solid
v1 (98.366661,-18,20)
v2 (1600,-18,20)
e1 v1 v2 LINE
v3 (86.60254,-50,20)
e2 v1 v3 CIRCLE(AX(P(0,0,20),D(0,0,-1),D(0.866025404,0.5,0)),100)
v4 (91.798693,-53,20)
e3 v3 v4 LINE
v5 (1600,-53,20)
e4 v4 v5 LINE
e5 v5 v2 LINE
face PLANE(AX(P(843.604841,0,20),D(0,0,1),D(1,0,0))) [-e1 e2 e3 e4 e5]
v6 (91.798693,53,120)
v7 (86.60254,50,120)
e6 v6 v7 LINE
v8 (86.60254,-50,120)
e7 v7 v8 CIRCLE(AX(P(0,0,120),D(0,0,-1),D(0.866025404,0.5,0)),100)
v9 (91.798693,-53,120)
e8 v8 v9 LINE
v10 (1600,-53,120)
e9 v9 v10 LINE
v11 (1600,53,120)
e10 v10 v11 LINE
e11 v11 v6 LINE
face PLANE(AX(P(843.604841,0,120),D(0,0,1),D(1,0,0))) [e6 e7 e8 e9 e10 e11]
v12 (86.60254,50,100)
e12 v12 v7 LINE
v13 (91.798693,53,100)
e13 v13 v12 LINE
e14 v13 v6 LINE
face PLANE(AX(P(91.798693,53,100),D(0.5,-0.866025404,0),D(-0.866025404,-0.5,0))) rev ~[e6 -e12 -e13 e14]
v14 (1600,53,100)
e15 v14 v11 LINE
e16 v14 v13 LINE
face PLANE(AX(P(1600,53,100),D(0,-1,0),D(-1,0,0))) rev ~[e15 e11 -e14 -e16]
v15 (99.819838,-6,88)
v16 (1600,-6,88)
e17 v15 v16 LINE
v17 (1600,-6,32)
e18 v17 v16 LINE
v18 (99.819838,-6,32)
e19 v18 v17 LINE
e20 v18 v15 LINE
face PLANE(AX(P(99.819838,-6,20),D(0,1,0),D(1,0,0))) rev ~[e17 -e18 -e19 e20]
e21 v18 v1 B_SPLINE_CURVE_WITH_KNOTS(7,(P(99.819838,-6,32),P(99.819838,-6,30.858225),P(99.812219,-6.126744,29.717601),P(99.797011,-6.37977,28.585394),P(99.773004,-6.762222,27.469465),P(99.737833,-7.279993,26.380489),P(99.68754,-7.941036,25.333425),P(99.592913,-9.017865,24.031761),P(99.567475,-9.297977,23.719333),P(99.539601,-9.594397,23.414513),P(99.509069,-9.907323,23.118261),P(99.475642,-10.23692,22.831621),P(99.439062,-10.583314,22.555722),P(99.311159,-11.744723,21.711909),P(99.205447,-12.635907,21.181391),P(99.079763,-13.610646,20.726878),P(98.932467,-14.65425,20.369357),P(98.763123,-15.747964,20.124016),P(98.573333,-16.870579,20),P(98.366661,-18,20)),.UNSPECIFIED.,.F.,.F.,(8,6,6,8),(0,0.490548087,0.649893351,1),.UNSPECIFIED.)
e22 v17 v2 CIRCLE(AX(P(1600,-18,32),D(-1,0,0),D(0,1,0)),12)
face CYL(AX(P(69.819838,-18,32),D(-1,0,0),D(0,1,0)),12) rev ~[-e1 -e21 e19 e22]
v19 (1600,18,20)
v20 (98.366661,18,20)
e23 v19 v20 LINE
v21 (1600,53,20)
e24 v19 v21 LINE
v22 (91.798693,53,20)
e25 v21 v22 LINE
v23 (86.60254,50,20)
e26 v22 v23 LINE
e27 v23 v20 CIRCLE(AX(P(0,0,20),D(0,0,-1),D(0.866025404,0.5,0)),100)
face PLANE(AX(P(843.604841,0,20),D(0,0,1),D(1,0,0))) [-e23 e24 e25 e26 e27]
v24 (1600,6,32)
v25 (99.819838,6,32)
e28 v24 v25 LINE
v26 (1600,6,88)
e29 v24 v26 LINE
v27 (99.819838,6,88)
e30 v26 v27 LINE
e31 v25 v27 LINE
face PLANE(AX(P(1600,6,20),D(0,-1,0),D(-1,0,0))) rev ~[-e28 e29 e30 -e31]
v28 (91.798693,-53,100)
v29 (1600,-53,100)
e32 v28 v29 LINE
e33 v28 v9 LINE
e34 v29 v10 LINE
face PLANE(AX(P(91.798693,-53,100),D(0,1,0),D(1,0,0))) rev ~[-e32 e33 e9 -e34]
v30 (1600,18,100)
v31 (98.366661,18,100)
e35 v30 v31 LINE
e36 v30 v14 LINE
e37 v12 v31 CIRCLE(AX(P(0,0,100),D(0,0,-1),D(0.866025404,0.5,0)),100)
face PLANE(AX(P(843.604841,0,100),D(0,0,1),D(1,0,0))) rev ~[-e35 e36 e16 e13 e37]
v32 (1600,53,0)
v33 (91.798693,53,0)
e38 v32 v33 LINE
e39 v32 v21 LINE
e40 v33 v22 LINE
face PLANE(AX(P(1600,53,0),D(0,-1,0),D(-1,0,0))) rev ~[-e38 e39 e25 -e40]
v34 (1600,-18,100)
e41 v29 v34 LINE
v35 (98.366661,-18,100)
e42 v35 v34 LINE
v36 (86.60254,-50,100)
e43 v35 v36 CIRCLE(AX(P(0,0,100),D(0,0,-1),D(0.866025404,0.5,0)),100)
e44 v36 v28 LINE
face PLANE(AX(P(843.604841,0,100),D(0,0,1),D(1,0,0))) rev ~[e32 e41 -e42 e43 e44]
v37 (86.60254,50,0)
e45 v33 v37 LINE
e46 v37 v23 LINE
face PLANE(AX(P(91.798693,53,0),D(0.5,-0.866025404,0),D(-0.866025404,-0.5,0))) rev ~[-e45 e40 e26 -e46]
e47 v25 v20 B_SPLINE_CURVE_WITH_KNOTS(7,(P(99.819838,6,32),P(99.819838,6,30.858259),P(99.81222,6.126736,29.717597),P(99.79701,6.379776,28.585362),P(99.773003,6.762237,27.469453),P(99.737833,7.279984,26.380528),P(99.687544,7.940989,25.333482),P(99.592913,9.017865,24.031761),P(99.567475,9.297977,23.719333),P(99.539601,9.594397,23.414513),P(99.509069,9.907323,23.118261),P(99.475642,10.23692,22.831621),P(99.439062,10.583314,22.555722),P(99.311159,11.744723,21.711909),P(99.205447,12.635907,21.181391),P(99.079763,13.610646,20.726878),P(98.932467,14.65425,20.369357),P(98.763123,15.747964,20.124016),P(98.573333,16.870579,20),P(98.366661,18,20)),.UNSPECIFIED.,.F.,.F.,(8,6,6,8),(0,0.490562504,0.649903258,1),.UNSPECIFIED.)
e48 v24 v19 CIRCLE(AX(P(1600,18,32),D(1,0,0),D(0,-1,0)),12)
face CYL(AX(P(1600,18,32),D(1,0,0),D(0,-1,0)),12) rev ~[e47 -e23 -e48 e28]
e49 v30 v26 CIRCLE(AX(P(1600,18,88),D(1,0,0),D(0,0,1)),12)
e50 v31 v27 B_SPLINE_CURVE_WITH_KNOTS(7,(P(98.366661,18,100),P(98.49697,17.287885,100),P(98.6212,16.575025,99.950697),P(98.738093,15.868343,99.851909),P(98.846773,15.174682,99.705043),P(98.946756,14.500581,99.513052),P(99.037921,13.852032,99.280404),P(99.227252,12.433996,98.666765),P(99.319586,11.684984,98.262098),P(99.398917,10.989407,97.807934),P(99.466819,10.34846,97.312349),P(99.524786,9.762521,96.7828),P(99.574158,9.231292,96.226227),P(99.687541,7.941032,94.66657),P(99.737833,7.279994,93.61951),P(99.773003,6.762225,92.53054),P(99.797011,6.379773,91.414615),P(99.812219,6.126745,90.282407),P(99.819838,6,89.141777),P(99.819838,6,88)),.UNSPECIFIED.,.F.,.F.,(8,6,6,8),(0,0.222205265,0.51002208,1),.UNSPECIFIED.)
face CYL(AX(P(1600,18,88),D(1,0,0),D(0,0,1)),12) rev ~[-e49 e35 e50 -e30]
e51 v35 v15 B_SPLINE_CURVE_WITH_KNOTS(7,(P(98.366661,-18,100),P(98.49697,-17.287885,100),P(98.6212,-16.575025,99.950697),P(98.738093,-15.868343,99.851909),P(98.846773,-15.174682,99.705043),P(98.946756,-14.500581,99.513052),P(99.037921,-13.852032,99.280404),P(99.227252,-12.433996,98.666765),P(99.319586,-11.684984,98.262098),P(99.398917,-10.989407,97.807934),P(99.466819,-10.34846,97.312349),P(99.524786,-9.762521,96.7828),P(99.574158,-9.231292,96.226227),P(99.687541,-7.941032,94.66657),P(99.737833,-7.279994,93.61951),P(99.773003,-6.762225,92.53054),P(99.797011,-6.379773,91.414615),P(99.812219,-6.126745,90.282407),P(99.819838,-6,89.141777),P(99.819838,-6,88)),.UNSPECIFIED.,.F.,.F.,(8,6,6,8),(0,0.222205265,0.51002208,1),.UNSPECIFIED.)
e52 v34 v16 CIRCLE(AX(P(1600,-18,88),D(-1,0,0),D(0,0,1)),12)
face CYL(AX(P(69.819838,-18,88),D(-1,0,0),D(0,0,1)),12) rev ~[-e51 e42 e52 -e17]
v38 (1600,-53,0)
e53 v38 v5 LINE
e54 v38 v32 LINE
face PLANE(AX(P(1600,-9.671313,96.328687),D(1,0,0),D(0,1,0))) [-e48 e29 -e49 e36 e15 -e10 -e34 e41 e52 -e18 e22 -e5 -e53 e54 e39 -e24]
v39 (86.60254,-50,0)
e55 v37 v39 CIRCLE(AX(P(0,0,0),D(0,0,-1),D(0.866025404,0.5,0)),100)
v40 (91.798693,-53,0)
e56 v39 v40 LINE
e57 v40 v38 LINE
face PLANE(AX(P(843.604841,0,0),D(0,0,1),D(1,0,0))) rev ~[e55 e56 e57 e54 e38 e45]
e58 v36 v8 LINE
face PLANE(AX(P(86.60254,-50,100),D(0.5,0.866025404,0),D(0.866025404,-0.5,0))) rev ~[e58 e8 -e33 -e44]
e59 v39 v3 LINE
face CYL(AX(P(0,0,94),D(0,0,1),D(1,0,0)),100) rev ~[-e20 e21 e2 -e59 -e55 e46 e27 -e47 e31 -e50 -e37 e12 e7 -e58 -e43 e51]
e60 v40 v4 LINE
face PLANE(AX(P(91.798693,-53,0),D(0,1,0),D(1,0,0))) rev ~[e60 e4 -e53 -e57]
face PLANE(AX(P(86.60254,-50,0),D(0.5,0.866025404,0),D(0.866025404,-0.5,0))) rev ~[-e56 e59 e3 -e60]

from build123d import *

# Parameters (mm, degrees)
F1_DEPTH     = 20
F3_DEPTH     = 80
F5_DEPTH     = 20
F6_T4_DEPTH  = 1530.1801622923
F6_S5_R      = 100
F6_T6_DEPTH  = 767
F6_T10_DEPTH = 1530.1801622923
F6_S11_R     = 100
F6_T12_DEPTH = 767
F6_T16_DEPTH = 1530.1801622923
F6_S17_R     = 100
F6_T18_DEPTH = 767
F6_T22_DEPTH = 1530.1801622923
F6_S23_R     = 100
F6_T24_DEPTH = 767


# Not quite as in the source:
# - a fillet or chamfer that OpenCascade refuses, or shapes differently, is made with other operations: its cross-section is extruded or revolved along the edge and cut away or added


with BuildPart() as f1:
    # F0 (on Top) → F1 (new body)
    with BuildSketch(Plane.XY):
        with BuildLine():
            Line((1600, -53), (1600, 0))
            Line((1600, 0), (1600, 53))
            Line((1600, 53), (91.7986928012, 53))
            Line((91.7986928012, 53), (86.6025403784, 50))
            ThreePointArc((86.6025403784, 50), (100, 0), (86.6025403784, -50))
            Line((86.6025403784, -50), (91.7986928012, -53))
            Line((91.7986928012, -53), (1600, -53))
        make_face()
    extrude(amount=F1_DEPTH)

    # F2 (on face) → F3 (join)
    with BuildSketch(Plane.XY.offset(20)):
        with BuildLine():
            ThreePointArc((99.8198377077, 6), (100, 0), (99.8198377077, -6))
            Line((99.8198377077, -6), (1600, -6))
            Line((1600, -6), (1600, 6))
            Line((1600, 6), (99.8198377077, 6))
        make_face()
    extrude(amount=F3_DEPTH)

    # F4 (on face) → F5 (join)
    with BuildSketch(Plane.XY.offset(100)):
        with BuildLine():
            ThreePointArc((86.6025403784, 50), (100, 0), (86.6025403784, -50))
            Line((86.6025403784, -50), (91.7986928012, -53))
            Line((91.7986928012, -53), (1600, -53))
            Line((1600, -53), (1600, 53))
            Line((1600, 53), (91.7986928012, 53))
            Line((91.7986928012, 53), (86.6025403784, 50))
        make_face()
    extrude(amount=F5_DEPTH)

    # F6: fillet of radius 12 on 4 edges, made by hand


with BuildPart() as f6_tool2:
    # F6_s3 → F6_t4 (new body)
    with BuildSketch(Plane.YZ.offset(1600)):
        with BuildLine():
            ThreePointArc((6, 32), (9.5147186258, 23.5147186258), (18, 20))
            Line((18, 20), (6, 20))
            Line((6, 20), (6, 32))
        make_face()
    extrude(amount=-F6_T4_DEPTH)

    # F6_s5 → F6_t6 (cut, symmetric)
    with BuildSketch(Plane.XY.offset(26)):
        Circle(F6_S5_R)
    extrude(amount=F6_T6_DEPTH, both=True, mode=Mode.SUBTRACT)


with BuildPart() as f1_1:
    add(f1.part)

    # F6_t1: union F6_tool2
    add(f6_tool2.part)


with BuildPart() as f6_tool8:
    # F6_s9 → F6_t10 (new body)
    with BuildSketch(Plane.YZ.offset(69.8198377077)):
        with BuildLine():
            ThreePointArc((-6, 32), (-9.5147186258, 23.5147186258), (-18, 20))
            Line((-18, 20), (-6, 20))
            Line((-6, 20), (-6, 32))
        make_face()
    extrude(amount=F6_T10_DEPTH)

    # F6_s11 → F6_t12 (cut, symmetric)
    with BuildSketch(Plane.XY.offset(26)):
        Circle(F6_S11_R)
    extrude(amount=F6_T12_DEPTH, both=True, mode=Mode.SUBTRACT)


with BuildPart() as f1_2:
    add(f1_1.part)

    # F6_t7: union F6_tool8
    add(f6_tool8.part)


with BuildPart() as f6_tool14:
    # F6_s15 → F6_t16 (new body)
    with BuildSketch(Plane.YZ.offset(1600)):
        with BuildLine():
            ThreePointArc((18, 100), (9.5147186258, 96.4852813742), (6, 88))
            Line((6, 88), (6, 100))
            Line((6, 100), (18, 100))
        make_face()
    extrude(amount=-F6_T16_DEPTH)

    # F6_s17 → F6_t18 (cut, symmetric)
    with BuildSketch(Plane.XY.offset(94)):
        Circle(F6_S17_R)
    extrude(amount=F6_T18_DEPTH, both=True, mode=Mode.SUBTRACT)


with BuildPart() as f1_3:
    add(f1_2.part)

    # F6_t13: union F6_tool14
    add(f6_tool14.part)


with BuildPart() as f6_tool20:
    # F6_s21 → F6_t22 (new body)
    with BuildSketch(Plane.YZ.offset(69.8198377077)):
        with BuildLine():
            ThreePointArc((-18, 100), (-9.5147186258, 96.4852813742), (-6, 88))
            Line((-6, 88), (-6, 100))
            Line((-6, 100), (-18, 100))
        make_face()
    extrude(amount=F6_T22_DEPTH)

    # F6_s23 → F6_t24 (cut, symmetric)
    with BuildSketch(Plane.XY.offset(94)):
        Circle(F6_S23_R)
    extrude(amount=F6_T24_DEPTH, both=True, mode=Mode.SUBTRACT)


with BuildPart() as f1_4:
    add(f1_3.part)

    # F6_t19: union F6_tool20
    add(f6_tool20.part)


solid = f1_4.part
